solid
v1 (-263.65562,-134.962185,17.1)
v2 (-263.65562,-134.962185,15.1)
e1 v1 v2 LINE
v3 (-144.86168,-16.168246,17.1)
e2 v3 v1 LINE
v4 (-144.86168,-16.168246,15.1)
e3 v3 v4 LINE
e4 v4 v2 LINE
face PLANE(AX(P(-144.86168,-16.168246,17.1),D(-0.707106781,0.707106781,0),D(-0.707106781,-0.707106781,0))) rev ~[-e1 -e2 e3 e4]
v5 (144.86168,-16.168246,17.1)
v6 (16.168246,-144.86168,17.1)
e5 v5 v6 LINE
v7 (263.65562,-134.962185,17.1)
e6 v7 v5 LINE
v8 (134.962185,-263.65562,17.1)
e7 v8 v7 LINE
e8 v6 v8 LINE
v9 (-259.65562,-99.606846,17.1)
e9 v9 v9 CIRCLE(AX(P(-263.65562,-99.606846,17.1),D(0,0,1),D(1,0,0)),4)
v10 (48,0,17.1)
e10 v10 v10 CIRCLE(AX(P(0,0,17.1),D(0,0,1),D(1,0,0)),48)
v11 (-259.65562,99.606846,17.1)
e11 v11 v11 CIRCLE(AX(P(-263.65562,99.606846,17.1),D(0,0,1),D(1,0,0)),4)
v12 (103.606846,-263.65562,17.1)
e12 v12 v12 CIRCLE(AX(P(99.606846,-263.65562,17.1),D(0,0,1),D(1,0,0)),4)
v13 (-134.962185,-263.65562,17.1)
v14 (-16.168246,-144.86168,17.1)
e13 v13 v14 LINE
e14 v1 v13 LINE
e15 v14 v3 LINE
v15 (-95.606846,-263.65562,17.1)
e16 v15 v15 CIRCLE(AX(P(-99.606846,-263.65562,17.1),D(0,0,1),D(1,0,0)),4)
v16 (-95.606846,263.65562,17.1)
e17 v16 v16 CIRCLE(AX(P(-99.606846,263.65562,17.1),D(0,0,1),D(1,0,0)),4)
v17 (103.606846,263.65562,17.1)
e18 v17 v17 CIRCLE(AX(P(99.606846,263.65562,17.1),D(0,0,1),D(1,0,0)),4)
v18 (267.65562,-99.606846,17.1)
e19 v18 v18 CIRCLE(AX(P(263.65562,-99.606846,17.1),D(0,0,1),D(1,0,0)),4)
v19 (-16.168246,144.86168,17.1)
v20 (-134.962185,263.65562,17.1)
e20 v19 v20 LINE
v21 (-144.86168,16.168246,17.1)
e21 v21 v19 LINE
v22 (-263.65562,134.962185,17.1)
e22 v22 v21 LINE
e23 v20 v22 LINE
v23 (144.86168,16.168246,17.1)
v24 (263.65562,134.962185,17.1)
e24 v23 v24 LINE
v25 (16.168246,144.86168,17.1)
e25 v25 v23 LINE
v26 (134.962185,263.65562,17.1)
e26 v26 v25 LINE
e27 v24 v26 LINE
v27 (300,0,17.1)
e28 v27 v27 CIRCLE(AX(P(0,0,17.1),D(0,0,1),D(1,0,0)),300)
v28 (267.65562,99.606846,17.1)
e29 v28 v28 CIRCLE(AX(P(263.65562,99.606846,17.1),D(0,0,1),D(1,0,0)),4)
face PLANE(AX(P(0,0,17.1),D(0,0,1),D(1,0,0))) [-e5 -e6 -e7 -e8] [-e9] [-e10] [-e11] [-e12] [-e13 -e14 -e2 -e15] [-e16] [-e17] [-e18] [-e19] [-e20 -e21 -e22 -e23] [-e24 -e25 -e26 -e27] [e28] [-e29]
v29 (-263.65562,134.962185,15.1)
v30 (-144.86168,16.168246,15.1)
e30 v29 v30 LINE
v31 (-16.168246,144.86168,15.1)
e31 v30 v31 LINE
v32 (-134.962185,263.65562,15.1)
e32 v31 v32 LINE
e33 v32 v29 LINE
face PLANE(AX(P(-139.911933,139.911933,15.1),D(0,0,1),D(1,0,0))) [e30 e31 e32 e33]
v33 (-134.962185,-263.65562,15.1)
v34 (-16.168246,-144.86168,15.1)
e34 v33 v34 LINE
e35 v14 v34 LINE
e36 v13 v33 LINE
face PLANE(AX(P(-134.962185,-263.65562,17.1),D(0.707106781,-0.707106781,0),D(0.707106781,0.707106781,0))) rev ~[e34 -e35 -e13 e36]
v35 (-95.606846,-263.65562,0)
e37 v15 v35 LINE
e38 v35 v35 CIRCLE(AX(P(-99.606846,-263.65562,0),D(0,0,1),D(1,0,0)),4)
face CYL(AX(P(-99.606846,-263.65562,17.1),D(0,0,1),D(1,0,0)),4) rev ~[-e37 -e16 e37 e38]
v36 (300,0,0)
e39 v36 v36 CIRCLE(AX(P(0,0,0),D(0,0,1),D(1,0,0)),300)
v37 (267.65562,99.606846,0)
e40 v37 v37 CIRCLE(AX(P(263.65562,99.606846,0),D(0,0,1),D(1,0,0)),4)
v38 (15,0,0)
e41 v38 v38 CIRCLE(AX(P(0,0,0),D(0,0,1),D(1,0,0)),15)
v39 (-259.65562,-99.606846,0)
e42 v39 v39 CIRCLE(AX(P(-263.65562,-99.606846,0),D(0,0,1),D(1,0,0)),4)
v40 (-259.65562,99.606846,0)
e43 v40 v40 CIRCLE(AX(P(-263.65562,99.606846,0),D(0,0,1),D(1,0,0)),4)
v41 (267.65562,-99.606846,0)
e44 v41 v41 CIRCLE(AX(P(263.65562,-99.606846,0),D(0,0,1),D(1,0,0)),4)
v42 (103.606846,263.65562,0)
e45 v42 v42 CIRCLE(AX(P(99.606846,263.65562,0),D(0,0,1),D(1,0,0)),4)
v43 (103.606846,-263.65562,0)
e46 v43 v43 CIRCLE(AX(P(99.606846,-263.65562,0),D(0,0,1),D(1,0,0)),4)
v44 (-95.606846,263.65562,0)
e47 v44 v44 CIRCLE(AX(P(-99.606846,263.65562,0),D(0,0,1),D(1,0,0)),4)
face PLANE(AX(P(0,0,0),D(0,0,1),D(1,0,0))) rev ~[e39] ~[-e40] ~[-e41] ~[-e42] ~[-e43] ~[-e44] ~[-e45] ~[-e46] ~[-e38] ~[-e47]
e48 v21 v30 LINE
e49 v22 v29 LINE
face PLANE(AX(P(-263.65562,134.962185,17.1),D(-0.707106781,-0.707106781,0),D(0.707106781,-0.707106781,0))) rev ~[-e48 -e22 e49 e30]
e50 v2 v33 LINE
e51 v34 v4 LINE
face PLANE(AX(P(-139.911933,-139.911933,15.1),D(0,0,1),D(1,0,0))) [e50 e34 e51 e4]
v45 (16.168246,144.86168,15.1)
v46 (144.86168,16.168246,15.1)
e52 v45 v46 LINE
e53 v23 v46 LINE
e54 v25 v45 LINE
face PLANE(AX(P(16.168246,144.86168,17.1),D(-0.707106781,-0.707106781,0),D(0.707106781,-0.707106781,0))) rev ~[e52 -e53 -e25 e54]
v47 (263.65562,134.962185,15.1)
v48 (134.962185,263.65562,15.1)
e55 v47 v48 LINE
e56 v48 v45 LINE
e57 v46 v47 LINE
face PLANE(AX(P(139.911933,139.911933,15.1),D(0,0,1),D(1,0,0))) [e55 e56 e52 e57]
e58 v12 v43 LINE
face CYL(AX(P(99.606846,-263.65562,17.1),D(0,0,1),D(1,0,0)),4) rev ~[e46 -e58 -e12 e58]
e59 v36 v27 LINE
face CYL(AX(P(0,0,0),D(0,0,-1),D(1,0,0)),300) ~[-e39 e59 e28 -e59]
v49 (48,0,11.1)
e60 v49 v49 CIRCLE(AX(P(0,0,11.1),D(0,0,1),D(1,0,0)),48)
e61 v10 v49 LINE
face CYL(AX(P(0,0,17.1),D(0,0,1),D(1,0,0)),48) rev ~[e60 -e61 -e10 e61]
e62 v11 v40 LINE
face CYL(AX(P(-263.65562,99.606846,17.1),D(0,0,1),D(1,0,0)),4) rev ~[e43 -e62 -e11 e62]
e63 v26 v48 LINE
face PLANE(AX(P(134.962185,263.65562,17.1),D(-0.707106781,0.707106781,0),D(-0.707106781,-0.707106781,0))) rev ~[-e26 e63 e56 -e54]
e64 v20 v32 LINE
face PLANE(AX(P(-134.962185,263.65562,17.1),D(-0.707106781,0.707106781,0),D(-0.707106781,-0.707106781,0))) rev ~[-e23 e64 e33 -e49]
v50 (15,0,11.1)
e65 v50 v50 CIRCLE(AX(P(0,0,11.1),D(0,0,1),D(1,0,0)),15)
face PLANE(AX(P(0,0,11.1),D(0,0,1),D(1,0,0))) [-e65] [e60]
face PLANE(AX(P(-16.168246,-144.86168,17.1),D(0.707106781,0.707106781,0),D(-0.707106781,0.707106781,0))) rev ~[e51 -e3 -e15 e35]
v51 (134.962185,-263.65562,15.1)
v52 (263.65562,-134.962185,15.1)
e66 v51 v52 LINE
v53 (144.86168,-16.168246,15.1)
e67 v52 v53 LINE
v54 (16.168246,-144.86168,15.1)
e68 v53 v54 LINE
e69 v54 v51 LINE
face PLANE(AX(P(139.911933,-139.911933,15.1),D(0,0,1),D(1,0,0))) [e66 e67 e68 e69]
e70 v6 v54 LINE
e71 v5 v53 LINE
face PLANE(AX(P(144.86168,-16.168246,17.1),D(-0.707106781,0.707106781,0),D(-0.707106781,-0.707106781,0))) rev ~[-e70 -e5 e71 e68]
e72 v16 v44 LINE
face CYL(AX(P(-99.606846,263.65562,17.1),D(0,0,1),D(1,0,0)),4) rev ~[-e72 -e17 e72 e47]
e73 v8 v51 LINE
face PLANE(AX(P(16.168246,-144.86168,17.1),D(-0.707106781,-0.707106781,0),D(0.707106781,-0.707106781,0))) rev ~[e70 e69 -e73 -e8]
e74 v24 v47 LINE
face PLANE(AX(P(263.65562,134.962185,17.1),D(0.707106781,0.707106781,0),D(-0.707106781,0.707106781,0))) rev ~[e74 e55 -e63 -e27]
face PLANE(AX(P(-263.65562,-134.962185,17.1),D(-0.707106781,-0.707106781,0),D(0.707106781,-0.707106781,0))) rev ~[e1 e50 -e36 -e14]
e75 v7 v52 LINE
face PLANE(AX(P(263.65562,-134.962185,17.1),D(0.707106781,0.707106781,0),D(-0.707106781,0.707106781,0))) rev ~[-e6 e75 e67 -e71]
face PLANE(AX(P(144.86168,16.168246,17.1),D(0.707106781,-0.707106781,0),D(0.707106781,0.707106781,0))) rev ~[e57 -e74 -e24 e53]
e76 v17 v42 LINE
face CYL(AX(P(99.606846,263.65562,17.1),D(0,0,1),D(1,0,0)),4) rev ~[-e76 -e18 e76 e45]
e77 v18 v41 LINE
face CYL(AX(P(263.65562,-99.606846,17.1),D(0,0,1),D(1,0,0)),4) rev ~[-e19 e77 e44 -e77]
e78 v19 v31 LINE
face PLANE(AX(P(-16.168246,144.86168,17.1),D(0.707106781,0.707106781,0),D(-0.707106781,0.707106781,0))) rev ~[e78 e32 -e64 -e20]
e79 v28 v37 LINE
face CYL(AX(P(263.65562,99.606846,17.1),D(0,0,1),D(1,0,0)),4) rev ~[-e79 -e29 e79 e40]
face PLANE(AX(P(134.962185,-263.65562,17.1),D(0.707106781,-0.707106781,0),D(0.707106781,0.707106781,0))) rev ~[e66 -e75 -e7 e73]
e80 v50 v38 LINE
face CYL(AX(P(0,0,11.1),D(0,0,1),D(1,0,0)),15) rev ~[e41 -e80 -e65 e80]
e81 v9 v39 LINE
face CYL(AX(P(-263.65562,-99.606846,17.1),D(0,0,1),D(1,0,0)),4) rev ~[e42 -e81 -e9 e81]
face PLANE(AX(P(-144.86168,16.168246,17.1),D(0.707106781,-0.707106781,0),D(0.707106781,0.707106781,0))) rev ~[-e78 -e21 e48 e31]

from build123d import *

# Parameters (mm, degrees)
F0_R     = 300
F1_DEPTH = 17.1
F3_DEPTH = 2
F4_R     = 4
F5_DEPTH = 25
F6_R     = 48
F7_DEPTH = 6
F8_R     = 15
F9_DEPTH = 11.101


# Not quite as in the source:
# - a feature names something its author has since deleted; it is built from what else it names


with BuildPart() as f1:
    # F0 (on Top) → F1 (new body)
    with BuildSketch(Plane.XY):
        Circle(F0_R)
    extrude(amount=F1_DEPTH)

    # F2 (on face) → F3 (cut)
    with BuildSketch(Plane.XY.offset(17.1)):
        Polygon((-144.8616802798, -16.1682461039), (-263.6556195192, -134.9621853432), (-134.9621853432, -263.6556195192), (-16.1682461039, -144.8616802798), align=None)
        Polygon((144.8616802798, -16.1682461039), (16.1682461039, -144.8616802798), (134.9621853432, -263.6556195192), (263.6556195192, -134.9621853432), align=None)
        Polygon((16.1682461039, 144.8616802798), (144.8616802798, 16.1682461039), (263.6556195192, 134.9621853432), (134.9621853432, 263.6556195192), align=None)
        Polygon((-144.8616802798, 16.1682461039), (-16.1682461039, 144.8616802798), (-134.9621853432, 263.6556195192), (-263.6556195192, 134.9621853432), align=None)
    extrude(amount=-F3_DEPTH, mode=Mode.SUBTRACT)

    # F4 (on face) → F5 (cut)
    with BuildSketch(Plane.XY.offset(17.1)):
        with Locations((-263.6556195192, -99.6068462839)):
            Circle(F4_R)
        with Locations((-99.6068462839, -263.6556195192)):
            Circle(F4_R)
        with Locations((99.6068462839, -263.6556195192)):
            Circle(F4_R)
        with Locations((263.6556195192, -99.6068462839)):
            Circle(F4_R)
        with Locations((263.6556195192, 99.6068462839)):
            Circle(F4_R)
        with Locations((99.6068462839, 263.6556195192)):
            Circle(F4_R)
        with Locations((-99.6068462839, 263.6556195192)):
            Circle(F4_R)
        with Locations((-263.6556195192, 99.6068462839)):
            Circle(F4_R)
    extrude(amount=-F5_DEPTH, mode=Mode.SUBTRACT)

    # F6 (on face) → F7 (cut)
    with BuildSketch(Plane.XY.offset(17.1)):
        Circle(F6_R)
    extrude(amount=-F7_DEPTH, mode=Mode.SUBTRACT)

    # F8 (on face) → F9 (cut, through all)
    with BuildSketch(Plane.XY.offset(11.1)):
        Circle(F8_R)
    extrude(amount=-F9_DEPTH, mode=Mode.SUBTRACT)


solid = f1.part
